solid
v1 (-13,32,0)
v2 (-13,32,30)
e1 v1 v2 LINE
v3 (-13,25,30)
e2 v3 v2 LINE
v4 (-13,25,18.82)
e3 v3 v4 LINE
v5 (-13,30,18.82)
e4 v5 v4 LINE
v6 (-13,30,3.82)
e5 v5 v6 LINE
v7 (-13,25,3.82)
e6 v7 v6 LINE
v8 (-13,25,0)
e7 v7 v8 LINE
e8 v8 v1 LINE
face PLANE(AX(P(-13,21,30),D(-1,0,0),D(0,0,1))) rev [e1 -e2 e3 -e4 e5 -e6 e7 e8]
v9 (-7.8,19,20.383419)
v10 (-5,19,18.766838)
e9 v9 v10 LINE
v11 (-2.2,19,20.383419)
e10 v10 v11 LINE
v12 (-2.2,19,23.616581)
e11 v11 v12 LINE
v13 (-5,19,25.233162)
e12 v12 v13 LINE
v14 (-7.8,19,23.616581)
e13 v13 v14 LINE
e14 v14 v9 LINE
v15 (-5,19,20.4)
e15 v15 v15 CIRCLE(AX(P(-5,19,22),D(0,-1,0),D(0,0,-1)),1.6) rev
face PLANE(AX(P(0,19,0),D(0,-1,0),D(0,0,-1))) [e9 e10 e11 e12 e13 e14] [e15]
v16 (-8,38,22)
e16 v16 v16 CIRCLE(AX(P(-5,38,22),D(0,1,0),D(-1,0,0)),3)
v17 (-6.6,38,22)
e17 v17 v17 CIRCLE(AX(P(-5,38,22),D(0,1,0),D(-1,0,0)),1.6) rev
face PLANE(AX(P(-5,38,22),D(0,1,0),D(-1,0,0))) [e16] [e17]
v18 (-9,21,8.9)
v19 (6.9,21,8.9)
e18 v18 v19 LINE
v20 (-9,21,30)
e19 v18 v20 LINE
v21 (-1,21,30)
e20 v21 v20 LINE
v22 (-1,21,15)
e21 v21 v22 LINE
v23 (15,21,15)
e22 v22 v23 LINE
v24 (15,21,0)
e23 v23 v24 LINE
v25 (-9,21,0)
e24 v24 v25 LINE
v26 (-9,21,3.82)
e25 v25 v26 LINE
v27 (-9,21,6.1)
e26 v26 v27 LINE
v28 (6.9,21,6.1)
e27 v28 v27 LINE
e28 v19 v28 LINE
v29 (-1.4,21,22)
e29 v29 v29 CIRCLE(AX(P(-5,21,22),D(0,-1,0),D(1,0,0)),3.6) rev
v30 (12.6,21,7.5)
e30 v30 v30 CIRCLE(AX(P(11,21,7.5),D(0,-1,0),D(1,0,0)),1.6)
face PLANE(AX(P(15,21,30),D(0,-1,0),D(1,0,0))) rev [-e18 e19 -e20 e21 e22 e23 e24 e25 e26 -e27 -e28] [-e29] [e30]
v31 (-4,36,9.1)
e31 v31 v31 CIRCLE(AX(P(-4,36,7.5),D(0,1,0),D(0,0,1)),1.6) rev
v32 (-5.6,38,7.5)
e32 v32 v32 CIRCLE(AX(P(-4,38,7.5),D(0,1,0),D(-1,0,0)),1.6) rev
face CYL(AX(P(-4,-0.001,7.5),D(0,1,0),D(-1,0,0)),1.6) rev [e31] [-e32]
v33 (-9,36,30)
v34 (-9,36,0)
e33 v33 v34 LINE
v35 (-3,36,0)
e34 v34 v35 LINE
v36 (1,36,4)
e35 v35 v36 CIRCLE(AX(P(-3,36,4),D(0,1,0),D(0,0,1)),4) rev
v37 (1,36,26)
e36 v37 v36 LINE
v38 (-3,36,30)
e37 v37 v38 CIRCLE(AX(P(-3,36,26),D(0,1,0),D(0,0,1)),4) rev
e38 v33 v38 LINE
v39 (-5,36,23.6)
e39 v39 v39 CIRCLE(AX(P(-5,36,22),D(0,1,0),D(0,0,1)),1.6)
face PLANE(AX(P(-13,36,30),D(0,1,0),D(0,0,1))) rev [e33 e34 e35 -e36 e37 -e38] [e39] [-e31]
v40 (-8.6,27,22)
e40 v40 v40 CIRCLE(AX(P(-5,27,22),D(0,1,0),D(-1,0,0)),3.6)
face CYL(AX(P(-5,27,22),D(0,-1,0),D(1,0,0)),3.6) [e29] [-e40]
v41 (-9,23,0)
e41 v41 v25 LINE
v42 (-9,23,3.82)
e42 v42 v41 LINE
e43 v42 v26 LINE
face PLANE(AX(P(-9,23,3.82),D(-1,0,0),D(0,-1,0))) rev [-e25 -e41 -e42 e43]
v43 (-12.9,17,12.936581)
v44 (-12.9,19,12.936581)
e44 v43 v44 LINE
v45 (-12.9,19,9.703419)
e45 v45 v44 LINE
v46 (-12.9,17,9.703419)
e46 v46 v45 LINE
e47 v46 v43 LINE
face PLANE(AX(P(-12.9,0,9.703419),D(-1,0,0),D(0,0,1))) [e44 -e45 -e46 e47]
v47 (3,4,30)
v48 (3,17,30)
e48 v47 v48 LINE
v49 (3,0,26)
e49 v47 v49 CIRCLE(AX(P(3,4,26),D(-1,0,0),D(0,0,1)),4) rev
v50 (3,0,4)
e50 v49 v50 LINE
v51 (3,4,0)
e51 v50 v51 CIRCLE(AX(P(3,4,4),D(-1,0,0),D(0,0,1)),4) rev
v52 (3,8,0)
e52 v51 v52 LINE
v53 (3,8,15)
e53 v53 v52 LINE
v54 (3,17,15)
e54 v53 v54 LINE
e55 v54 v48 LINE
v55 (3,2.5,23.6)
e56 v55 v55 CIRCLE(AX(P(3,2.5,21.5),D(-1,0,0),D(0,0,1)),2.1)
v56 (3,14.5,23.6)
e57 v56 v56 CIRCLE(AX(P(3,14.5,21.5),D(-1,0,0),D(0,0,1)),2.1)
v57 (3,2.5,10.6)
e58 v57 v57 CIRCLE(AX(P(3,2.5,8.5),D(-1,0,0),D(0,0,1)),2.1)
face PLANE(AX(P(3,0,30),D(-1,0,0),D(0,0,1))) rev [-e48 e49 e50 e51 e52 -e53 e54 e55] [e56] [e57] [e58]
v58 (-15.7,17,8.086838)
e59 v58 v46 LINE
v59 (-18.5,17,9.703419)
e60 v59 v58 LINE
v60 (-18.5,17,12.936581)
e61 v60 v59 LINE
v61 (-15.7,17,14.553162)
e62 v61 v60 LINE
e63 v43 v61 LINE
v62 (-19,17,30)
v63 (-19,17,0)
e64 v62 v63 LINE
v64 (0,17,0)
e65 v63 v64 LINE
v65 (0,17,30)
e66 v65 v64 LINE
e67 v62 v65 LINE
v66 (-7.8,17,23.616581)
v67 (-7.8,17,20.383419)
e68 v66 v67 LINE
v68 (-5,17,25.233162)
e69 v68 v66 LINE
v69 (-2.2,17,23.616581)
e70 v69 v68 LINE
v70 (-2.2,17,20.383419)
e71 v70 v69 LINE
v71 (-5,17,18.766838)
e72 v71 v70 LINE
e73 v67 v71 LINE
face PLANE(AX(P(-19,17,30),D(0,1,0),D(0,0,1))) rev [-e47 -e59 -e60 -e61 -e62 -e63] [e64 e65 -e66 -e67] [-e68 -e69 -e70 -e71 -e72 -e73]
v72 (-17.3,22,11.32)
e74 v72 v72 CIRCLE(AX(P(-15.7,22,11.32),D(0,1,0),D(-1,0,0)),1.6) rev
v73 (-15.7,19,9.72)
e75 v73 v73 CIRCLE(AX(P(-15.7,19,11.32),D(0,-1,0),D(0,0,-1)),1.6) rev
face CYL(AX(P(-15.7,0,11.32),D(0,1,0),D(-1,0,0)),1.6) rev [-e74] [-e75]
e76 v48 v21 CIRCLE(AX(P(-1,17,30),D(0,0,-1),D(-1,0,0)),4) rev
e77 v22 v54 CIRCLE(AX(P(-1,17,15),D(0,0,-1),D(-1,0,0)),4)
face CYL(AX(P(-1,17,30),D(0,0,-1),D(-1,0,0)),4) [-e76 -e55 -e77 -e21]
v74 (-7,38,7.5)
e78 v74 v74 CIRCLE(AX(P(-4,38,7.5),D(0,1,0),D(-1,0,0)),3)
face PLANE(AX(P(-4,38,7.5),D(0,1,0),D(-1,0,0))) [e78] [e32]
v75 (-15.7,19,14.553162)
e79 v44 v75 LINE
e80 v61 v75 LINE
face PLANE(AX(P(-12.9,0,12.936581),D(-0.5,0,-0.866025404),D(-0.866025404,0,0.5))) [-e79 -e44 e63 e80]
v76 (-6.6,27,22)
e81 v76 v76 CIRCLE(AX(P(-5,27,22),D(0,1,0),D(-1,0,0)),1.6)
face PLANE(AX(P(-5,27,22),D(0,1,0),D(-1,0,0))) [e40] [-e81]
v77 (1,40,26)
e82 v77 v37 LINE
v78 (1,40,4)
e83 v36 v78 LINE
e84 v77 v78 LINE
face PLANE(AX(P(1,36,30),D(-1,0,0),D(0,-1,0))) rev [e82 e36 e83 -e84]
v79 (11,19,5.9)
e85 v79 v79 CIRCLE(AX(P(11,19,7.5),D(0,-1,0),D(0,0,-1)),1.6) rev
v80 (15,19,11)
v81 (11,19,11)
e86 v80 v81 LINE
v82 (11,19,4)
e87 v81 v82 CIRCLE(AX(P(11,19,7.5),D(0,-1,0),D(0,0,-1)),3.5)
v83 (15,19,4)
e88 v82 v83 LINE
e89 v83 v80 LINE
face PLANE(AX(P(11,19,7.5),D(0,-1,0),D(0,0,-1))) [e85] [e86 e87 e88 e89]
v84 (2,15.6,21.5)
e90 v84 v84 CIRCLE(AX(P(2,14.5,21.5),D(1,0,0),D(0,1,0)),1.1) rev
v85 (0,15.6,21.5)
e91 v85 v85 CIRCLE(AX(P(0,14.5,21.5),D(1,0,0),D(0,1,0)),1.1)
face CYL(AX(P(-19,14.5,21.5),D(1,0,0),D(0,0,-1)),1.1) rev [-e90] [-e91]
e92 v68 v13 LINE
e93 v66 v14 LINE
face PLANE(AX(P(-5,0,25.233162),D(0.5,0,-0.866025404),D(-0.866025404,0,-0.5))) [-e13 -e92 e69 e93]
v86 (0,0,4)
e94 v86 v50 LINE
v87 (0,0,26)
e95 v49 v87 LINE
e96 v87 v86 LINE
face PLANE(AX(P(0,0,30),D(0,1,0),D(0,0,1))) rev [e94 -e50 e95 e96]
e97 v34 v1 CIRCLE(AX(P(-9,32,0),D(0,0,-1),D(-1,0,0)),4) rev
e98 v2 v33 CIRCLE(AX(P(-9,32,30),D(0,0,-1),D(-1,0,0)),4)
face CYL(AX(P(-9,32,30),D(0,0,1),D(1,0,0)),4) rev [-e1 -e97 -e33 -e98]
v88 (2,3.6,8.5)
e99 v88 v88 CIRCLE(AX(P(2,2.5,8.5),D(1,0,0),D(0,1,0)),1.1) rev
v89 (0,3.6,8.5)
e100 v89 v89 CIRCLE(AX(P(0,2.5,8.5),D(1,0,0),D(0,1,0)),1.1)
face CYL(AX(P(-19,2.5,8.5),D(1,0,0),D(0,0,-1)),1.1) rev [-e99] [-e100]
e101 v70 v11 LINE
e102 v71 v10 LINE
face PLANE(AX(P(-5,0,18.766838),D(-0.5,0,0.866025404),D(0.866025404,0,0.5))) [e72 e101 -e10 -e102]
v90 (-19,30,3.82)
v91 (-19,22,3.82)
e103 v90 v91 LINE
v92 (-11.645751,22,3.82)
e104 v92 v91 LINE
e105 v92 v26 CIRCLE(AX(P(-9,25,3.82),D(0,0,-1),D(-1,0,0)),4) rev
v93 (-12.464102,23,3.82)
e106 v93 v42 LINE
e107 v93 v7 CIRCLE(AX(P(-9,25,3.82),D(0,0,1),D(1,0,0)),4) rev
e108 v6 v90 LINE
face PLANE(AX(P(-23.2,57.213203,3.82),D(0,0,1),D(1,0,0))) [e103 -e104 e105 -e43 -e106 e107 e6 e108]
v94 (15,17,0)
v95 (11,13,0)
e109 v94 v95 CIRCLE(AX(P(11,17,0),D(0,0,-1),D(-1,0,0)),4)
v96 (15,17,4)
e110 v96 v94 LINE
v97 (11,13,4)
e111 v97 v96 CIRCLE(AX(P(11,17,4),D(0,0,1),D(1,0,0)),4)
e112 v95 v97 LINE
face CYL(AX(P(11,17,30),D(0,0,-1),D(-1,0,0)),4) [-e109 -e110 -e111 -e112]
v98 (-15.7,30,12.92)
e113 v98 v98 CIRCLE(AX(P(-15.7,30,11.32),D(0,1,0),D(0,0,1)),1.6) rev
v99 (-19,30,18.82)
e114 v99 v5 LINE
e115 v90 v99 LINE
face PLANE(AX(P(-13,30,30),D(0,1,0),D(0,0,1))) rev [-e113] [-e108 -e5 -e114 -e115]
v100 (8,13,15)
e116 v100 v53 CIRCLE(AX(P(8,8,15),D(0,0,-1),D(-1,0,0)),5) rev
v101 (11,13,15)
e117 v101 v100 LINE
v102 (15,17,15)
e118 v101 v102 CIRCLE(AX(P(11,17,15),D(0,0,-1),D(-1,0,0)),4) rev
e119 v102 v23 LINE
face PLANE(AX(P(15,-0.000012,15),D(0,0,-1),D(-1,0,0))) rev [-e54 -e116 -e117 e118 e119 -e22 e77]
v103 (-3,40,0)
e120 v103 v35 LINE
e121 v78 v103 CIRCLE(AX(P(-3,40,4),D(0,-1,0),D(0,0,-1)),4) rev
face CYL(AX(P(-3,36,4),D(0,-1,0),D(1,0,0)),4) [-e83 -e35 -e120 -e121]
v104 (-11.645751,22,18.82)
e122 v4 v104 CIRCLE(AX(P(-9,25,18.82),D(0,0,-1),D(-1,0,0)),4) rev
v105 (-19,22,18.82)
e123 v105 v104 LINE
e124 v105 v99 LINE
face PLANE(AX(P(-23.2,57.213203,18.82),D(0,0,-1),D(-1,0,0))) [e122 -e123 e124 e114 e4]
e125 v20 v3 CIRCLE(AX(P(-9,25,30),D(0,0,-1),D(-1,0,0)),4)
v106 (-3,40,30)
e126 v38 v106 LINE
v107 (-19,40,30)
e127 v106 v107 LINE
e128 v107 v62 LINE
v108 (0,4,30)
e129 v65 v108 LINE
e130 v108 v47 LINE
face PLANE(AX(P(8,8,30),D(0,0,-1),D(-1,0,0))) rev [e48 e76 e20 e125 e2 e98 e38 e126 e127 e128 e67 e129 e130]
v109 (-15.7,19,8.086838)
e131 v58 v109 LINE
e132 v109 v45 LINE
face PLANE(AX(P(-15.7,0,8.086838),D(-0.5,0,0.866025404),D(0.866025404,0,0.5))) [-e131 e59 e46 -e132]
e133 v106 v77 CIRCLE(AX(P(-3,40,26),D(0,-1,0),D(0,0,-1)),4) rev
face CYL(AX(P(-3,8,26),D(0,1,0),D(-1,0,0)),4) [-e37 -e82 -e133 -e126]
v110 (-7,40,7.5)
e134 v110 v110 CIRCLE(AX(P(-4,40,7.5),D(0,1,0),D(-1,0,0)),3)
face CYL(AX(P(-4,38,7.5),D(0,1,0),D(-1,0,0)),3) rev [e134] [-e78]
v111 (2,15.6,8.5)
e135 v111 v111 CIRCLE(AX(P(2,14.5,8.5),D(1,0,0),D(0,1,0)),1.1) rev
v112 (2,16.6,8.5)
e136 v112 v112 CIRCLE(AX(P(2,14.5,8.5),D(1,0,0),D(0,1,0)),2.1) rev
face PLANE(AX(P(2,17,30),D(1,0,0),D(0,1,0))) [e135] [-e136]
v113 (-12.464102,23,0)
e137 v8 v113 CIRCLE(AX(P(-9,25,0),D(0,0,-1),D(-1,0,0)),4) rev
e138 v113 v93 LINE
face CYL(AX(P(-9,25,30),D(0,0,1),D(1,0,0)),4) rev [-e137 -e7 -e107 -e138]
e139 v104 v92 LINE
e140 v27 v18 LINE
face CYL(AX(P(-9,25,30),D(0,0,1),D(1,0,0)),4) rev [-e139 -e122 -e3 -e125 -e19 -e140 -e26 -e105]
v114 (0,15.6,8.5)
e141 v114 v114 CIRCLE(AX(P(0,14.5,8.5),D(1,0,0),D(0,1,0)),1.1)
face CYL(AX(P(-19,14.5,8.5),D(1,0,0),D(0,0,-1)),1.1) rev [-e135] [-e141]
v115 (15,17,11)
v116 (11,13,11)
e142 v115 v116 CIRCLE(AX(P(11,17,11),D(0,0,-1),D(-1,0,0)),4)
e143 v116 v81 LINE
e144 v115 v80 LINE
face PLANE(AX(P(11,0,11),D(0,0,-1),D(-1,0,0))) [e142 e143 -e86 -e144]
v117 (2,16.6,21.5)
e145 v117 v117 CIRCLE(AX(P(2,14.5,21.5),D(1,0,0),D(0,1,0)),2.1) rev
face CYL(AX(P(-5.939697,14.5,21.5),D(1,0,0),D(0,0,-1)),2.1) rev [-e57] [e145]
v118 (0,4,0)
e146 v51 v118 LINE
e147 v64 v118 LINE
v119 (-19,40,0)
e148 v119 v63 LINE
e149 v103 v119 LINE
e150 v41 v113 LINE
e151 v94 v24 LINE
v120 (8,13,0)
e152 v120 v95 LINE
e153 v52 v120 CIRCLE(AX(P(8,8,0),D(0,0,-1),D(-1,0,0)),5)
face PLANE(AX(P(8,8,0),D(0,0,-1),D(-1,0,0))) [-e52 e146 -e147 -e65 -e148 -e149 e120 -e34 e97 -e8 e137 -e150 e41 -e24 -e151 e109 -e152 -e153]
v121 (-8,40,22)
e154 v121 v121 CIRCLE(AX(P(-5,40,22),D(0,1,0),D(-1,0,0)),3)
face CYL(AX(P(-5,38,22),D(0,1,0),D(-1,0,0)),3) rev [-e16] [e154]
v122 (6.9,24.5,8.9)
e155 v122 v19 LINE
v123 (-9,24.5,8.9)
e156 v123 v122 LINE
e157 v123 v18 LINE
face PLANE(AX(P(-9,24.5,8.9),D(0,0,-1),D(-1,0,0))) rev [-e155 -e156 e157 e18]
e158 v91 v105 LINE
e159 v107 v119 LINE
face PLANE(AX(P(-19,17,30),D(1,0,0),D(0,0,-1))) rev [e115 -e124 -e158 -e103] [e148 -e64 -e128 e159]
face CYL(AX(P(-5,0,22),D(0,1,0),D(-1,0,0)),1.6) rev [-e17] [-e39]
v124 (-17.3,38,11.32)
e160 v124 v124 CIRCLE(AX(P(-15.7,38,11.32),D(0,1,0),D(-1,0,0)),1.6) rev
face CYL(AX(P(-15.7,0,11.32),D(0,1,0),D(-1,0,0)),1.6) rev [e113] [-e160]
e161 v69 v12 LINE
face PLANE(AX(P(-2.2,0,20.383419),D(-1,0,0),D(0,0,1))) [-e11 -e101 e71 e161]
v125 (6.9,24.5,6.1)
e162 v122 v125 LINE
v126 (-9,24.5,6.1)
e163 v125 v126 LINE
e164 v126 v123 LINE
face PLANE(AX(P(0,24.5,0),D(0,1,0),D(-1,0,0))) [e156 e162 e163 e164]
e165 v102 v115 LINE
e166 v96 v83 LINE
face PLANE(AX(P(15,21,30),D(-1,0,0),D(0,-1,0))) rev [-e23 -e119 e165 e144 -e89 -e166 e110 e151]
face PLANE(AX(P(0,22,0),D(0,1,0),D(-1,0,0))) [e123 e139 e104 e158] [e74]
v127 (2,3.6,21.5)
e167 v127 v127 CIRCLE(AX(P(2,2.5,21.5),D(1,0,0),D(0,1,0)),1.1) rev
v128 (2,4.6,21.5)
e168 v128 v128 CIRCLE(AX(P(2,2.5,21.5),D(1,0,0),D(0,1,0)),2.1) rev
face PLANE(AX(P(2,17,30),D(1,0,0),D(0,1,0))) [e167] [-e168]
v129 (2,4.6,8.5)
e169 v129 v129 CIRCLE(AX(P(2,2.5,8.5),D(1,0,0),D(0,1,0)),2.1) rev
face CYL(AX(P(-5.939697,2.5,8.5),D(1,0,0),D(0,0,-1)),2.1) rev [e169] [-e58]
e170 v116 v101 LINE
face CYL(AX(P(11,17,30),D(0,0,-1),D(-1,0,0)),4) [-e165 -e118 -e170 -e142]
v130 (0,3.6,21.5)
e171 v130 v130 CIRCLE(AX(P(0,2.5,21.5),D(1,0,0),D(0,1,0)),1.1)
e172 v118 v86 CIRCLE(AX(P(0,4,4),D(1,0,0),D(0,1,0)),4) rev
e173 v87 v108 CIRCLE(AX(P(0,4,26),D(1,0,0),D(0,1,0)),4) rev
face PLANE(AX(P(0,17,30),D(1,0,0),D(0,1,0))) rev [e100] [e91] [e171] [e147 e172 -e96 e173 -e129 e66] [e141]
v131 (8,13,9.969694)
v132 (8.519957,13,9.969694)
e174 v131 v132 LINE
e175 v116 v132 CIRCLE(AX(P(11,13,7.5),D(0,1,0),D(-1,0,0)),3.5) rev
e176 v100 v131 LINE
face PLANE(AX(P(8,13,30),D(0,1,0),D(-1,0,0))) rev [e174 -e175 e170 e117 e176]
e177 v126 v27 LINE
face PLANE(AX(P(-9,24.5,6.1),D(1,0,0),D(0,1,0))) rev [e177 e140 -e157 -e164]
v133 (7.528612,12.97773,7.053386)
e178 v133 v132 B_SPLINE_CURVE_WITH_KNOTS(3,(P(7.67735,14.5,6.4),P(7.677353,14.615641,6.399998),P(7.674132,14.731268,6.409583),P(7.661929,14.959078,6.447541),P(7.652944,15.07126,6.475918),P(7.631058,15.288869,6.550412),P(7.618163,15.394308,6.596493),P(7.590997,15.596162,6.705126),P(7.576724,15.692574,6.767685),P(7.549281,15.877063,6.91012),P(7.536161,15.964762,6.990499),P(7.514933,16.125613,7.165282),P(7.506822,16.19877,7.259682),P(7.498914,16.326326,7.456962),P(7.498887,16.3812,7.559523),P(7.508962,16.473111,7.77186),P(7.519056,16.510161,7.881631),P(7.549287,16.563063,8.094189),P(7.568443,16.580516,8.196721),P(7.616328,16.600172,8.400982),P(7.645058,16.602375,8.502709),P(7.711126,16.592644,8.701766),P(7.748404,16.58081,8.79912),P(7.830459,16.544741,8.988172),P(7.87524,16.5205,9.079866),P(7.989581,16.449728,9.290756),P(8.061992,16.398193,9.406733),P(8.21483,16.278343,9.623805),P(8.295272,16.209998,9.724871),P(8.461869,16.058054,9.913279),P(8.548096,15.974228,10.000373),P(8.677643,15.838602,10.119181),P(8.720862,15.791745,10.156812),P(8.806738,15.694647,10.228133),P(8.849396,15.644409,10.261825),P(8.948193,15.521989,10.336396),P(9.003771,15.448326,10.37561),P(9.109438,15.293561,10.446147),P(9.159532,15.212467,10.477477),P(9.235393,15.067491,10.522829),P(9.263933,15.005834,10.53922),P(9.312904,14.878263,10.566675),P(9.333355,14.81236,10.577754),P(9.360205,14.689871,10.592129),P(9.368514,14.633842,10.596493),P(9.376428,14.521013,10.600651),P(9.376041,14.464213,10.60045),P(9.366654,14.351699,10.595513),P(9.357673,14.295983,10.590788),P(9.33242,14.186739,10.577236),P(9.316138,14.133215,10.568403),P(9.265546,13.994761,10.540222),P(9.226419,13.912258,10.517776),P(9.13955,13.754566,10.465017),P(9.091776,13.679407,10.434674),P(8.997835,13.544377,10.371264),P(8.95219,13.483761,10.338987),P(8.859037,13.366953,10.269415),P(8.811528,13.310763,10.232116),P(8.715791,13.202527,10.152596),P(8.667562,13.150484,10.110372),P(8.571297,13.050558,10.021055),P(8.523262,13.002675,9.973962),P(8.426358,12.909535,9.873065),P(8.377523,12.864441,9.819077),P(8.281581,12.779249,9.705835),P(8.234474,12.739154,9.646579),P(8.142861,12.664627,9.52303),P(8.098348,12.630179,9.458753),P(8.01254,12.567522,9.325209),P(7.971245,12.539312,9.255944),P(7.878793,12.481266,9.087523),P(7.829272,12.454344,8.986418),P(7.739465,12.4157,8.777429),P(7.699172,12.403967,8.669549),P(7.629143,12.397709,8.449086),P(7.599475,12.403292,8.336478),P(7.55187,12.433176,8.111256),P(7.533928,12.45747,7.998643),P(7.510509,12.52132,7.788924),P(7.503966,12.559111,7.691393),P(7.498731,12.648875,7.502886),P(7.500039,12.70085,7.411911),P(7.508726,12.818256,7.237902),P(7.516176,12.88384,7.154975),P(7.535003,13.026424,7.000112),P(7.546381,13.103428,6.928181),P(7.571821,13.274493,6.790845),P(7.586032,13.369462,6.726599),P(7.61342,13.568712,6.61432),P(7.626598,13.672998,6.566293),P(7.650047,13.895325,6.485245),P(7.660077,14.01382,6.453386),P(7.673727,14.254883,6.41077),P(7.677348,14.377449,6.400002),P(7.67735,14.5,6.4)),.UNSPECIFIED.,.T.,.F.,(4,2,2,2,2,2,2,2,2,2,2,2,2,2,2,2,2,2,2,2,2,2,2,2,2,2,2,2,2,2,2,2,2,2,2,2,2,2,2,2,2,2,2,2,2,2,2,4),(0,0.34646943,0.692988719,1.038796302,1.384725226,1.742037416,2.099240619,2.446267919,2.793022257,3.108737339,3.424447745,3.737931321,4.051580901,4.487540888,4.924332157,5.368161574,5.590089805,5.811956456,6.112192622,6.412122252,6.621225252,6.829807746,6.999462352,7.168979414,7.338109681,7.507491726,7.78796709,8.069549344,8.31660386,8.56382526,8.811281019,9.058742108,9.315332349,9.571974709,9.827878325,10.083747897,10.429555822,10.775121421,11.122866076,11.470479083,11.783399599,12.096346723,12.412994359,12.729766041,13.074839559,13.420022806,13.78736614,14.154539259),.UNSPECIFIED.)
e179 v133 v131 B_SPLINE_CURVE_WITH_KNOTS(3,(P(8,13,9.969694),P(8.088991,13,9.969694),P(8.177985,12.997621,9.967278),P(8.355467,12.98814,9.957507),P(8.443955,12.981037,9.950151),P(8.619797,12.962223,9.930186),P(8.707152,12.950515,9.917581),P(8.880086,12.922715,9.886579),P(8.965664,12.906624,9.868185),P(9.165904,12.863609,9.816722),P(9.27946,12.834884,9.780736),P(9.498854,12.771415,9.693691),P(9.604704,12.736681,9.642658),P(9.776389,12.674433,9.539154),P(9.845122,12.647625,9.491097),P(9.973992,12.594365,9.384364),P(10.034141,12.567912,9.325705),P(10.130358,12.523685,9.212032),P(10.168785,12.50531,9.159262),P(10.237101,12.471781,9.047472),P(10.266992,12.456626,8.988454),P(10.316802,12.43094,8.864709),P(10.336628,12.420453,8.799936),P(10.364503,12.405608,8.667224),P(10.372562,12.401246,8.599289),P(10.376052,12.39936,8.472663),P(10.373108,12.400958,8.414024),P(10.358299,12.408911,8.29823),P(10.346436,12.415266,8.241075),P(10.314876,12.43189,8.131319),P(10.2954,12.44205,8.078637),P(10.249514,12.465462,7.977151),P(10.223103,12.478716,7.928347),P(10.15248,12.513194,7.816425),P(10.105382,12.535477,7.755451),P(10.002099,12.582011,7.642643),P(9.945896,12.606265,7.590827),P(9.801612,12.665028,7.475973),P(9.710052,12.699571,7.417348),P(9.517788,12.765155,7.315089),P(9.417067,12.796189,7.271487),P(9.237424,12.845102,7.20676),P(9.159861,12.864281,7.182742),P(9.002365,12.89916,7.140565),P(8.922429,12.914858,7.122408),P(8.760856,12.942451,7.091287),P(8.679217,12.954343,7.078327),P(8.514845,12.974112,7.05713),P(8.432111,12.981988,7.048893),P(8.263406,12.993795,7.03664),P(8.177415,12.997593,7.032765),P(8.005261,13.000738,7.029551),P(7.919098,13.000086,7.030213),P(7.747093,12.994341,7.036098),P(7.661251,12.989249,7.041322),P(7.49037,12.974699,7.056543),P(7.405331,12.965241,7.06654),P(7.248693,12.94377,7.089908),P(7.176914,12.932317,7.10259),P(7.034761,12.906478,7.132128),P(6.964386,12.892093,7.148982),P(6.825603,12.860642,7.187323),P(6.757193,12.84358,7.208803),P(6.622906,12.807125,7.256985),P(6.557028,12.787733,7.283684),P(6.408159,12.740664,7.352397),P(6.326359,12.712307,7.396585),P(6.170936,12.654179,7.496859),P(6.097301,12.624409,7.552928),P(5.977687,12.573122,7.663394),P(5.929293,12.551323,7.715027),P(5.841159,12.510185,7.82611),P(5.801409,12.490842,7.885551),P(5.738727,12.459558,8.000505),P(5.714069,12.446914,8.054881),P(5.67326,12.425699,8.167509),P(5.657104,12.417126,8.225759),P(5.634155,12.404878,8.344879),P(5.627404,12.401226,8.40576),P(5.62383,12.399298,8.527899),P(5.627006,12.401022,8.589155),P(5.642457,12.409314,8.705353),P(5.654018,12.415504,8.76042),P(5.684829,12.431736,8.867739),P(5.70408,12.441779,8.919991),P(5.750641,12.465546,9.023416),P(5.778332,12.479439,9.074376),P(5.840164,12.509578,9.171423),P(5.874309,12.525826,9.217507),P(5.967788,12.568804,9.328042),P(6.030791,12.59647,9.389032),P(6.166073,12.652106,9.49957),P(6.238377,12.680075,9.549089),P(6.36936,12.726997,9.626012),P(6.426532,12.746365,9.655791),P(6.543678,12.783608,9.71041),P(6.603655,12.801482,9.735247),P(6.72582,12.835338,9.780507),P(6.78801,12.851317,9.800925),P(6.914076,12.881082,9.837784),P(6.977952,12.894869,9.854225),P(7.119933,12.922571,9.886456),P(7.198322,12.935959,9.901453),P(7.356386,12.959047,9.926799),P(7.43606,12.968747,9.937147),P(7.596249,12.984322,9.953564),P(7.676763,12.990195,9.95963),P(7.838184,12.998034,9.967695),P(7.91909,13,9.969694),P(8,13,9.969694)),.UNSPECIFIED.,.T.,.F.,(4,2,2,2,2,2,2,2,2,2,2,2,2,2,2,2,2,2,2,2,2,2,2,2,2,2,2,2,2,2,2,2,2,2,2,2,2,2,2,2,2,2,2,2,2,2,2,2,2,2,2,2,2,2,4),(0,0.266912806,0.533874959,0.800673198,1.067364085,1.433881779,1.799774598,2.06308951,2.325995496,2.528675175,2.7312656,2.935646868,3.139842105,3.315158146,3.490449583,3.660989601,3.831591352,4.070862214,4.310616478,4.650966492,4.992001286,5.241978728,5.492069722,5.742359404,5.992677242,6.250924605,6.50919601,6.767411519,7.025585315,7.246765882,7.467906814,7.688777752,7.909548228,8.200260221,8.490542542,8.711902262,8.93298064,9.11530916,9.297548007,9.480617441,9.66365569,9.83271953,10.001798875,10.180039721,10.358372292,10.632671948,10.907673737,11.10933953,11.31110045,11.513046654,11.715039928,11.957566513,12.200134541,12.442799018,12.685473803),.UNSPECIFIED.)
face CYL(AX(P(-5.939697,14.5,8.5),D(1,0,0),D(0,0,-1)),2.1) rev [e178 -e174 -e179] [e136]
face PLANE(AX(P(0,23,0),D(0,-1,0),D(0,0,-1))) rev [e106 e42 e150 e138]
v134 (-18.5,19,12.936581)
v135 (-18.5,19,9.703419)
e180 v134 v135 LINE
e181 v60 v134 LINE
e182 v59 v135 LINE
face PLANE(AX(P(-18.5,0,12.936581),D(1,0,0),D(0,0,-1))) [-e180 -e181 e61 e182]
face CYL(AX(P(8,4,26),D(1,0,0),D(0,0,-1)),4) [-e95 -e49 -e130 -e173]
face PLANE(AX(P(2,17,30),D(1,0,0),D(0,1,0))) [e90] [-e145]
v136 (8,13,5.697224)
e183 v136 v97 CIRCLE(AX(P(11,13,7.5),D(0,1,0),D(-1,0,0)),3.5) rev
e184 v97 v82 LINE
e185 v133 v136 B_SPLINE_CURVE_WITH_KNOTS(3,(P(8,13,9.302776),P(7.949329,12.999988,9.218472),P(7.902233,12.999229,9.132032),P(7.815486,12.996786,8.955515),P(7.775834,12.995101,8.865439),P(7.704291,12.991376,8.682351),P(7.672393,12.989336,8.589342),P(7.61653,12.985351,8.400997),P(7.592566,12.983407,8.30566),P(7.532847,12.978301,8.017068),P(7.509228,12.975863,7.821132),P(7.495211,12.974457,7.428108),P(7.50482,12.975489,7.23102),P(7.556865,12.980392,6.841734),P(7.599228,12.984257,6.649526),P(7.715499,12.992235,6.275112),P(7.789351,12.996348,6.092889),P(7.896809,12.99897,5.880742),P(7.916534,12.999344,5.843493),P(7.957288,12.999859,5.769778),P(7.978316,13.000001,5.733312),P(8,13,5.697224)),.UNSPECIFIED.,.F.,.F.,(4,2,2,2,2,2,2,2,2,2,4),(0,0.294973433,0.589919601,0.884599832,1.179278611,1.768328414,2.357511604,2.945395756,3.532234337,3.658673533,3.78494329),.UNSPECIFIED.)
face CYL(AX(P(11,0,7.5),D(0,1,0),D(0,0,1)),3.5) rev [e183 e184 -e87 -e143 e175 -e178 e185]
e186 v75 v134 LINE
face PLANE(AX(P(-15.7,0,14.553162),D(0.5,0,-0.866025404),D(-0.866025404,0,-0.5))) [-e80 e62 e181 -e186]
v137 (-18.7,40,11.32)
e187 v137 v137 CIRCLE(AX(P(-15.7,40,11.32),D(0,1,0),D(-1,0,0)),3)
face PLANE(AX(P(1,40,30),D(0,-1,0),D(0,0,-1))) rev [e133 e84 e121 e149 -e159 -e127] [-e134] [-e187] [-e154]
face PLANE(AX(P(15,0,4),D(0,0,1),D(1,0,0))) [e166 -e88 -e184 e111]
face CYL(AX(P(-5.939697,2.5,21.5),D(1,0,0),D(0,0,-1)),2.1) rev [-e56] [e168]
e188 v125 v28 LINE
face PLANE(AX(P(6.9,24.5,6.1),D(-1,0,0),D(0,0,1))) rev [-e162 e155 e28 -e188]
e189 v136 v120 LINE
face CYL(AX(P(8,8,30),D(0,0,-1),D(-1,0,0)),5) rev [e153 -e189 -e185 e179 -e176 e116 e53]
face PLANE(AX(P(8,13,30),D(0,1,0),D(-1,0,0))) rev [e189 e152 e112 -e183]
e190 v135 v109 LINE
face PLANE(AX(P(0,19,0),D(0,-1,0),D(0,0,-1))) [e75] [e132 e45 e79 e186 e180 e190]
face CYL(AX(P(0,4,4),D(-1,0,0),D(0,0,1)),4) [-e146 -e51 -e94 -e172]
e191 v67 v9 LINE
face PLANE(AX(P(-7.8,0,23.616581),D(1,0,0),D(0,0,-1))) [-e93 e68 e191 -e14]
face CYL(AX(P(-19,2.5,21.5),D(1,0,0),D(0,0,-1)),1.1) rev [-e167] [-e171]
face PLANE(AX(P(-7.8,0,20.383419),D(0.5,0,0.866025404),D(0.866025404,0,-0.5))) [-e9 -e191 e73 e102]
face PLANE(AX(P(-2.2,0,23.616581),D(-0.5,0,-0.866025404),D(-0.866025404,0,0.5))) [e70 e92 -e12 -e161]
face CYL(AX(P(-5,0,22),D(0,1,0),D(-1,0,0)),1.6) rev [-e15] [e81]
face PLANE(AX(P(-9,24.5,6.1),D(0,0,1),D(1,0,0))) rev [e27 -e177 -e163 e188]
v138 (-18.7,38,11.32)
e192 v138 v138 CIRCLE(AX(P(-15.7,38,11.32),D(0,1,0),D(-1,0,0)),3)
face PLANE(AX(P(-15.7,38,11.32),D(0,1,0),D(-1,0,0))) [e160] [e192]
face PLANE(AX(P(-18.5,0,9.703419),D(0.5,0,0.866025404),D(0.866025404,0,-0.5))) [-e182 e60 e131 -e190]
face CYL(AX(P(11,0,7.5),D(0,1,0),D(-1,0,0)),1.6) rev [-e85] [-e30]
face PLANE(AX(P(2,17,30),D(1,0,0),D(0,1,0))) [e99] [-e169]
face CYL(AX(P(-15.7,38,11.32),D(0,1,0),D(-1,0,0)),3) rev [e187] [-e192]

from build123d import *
from build123d.topology import SkipClean

# Parameters (mm, degrees)
RESSALTO_EXTRUS_O1_DEPTH      = 30
CORTE_EXTRUS_O1_DEPTH         = 54.488316481
CORTE_EXTRUS_O1_DEPTH_BACK    = 54.488316481
ESBO_O3_R                     = 1.1
CORTE_EXTRUS_O6_DEPTH         = 54.488316481
CORTE_EXTRUS_O6_DEPTH_BACK    = 54.488316481
ESBO_O4_W                     = 12
ESBO_O4_H                     = 15
ESBO_O5_R                     = 1.6
CORTE_EXTRUS_O7_DEPTH         = 54.488316481
CORTE_EXTRUS_O9_START         = 1
ESBO_O7_W                     = 15
ESBO_O7_H                     = 15
CORTE_EXTRUS_O9_DEPTH         = 8
CORTE_EXTRUS_O11_REACH        = 55.488
ESBO_O9_R                     = 1.6
ESBO_O8_R                     = 3
CORTE_EXTRUS_O10_DEPTH        = 2
CORTE_EXTRUS_O14_DEPTH        = 43.308391603
CORTE_EXTRUS_O14_DEPTH_BACK   = 2
CORTE_EXTRUS_O16_DEPTH        = 55.626001135
CORTE_EXTRUS_O16_DEPTH_BACK   = 1
ESBO_O15_R                    = 2.1
FILETE1_R                     = 4
ESBO_O16_W                    = 10
ESBO_O16_H                    = 3.82
RESSALTO_EXTRUS_O2_DEPTH      = 2
ESBO_O17_W                    = 15.9
ESBO_O17_H                    = 2.8
RESSALTO_EXTRUS_O3_DEPTH      = 3.5
RESSALTO_EXTRUS_O4_DEPTH      = 6
RESSALTO_EXTRUS_O4_DEPTH_BACK = 1
ESBO_O20_R                    = 3.6
ESBO_O20_R_2                  = 1.6


with BuildPart() as part:
    # Esboço1 → Ressalto-extrusão1 (new body)
    with BuildSketch(Plane.XY):
        with BuildLine():
            Line((0, 0), (3, 0))
            Line((3, 0), (3, 8))
            ThreePointArc((3, 8), (4.464466094, 11.535533906), (8, 13))
            Line((8, 13), (15, 13))
            Line((15, 13), (15, 21))
            Line((15, 21), (-13, 21))
            Line((-13, 21), (-13, 36))
            Line((-13, 36), (1, 36))
            Line((1, 36), (1, 40))
            Line((1, 40), (-19, 40))
            Line((-19, 40), (-19, 17))
            Line((-19, 17), (0, 17))
            Line((0, 17), (0, 0))
        make_face()
    extrude(amount=RESSALTO_EXTRUS_O1_DEPTH)

    # Esboço3 → Corte-extrusão1 (cut, two sides: drawn at the far end of the back side and taken through both)
    with BuildSketch(Plane(origin=(0, 0, 0), x_dir=(0, 0, -1), z_dir=(1, 0, 0)).offset(-CORTE_EXTRUS_O1_DEPTH_BACK)):
        with Locations((-8.5, 14.5)):
            Circle(ESBO_O3_R)
        with Locations(Location((-21.5, 14.5, 0), (0, 0, 90))):
            Circle(ESBO_O3_R)
        with Locations(Location((-8.5, 2.5, 0), (0, 0, 90))):
            Circle(ESBO_O3_R)
        with Locations(Location((-21.5, 2.5, 0), (0, 0, 90))):
            Circle(ESBO_O3_R)
    extrude(amount=CORTE_EXTRUS_O1_DEPTH + CORTE_EXTRUS_O1_DEPTH_BACK, mode=Mode.SUBTRACT)

    # Esboço4 → Corte-extrusão6 (cut, two sides: drawn at the far end of the back side and taken through both)
    with BuildSketch(Plane(origin=(0, 0, 0), x_dir=(1, 0, 0), z_dir=(0, 1, 0)).offset(-CORTE_EXTRUS_O6_DEPTH_BACK)):
        with Locations((9, -22.5)):
            Rectangle(ESBO_O4_W, ESBO_O4_H)
    extrude(amount=CORTE_EXTRUS_O6_DEPTH + CORTE_EXTRUS_O6_DEPTH_BACK, mode=Mode.SUBTRACT)

    # Esboço5 → Corte-extrusão7 (cut, through all)
    with BuildSketch(Plane(origin=(0, 40, 0), x_dir=(1, 0, 0), z_dir=(0, 1, 0))):
        with Locations(Location((-5, -22, 0), (0, 0, 270))):
            Circle(ESBO_O5_R)
        with Locations(Location((-15.7, -11.32, 0), (0, 0, 180))):
            Circle(ESBO_O5_R)
        with Locations(Location((11, -7.5, 0), (0, 0, 180))):
            Circle(ESBO_O5_R)
    extrude(amount=-CORTE_EXTRUS_O7_DEPTH, mode=Mode.SUBTRACT)

    # Esboço7 → Corte-extrusão9 (cut)
    with BuildSketch(Plane(origin=(0, 21, 0), x_dir=(1, 0, 0), z_dir=(0, 1, 0)).offset(CORTE_EXTRUS_O9_START)):
        with Locations((-15.7, -11.32)):
            Rectangle(ESBO_O7_W, ESBO_O7_H)
    extrude(amount=CORTE_EXTRUS_O9_DEPTH, mode=Mode.SUBTRACT)

    # Esboço9 → Corte-extrusão11 (cut, up to next)
    with BuildSketch(Plane(origin=(0, 40, 0), x_dir=(1, 0, 0), z_dir=(0, 1, 0)), mode=Mode.PRIVATE) as corte_extrus_o11_sk1:
        with Locations(Location((-4, -7.5, 0), (0, 0, 180))):
            Circle(ESBO_O9_R)
    corte_extrus_o11_tool1 = extrude(corte_extrus_o11_sk1.sketch, amount=-CORTE_EXTRUS_O11_REACH, mode=Mode.PRIVATE) & part.part
    add(corte_extrus_o11_tool1.solids().sort_by_distance((-4, 40, 7.5))[0], mode=Mode.SUBTRACT)

    # Esboço8 → Corte-extrusão10 (cut)
    with BuildSketch(Plane(origin=(0, 40, 0), x_dir=(1, 0, 0), z_dir=(0, 1, 0))):
        with Locations(Location((-15.7, -11.32, 0), (0, 0, 180))):
            Circle(ESBO_O8_R)
        with Locations(Location((-5, -22, 0), (0, 0, 180))):
            Circle(ESBO_O8_R)
        with Locations(Location((-4, -7.5, 0), (0, 0, 180))):
            Circle(ESBO_O8_R)
    extrude(amount=-CORTE_EXTRUS_O10_DEPTH, mode=Mode.SUBTRACT)

    # Esboço14 → Corte-extrusão14 (cut, two sides: drawn at the far end of the back side and taken through both)
    with BuildSketch(Plane.XZ.offset(-17).offset(-CORTE_EXTRUS_O14_DEPTH_BACK)):
        with BuildLine():
            Line((11, 11), (15, 11))
            Line((15, 11), (15, 4))
            Line((15, 4), (11, 4))
            ThreePointArc((11, 4), (7.5, 7.5), (11, 11))
        make_face()
        Polygon((-5, 25.233161507), (-7.8, 23.616580754), (-7.8, 20.383419246), (-5, 18.766838493), (-2.2, 20.383419246), (-2.2, 23.616580754), align=None)
        Polygon((-15.7, 14.553161507), (-18.5, 12.936580754), (-18.5, 9.703419246), (-15.7, 8.086838493), (-12.9, 9.703419246), (-12.9, 12.936580754), align=None)
    extrude(amount=CORTE_EXTRUS_O14_DEPTH + CORTE_EXTRUS_O14_DEPTH_BACK, mode=Mode.SUBTRACT)

    # Esboço15 → Corte-extrusão16 (cut, two sides: drawn at the far end of the back side and taken through both)
    with BuildSketch(Plane(origin=(3, 0, 0), x_dir=(0, 0, -1), z_dir=(1, 0, 0)).offset(-CORTE_EXTRUS_O16_DEPTH_BACK)):
        with Locations(Location((-21.5, 14.5, 0), (0, 0, 90))):
            Circle(ESBO_O15_R)
        with Locations(Location((-8.5, 14.5, 0), (0, 0, 313.540252108))):
            Circle(ESBO_O15_R)
        with Locations(Location((-8.5, 2.5, 0), (0, 0, 90))):
            Circle(ESBO_O15_R)
        with Locations(Location((-21.5, 2.5, 0), (0, 0, 90))):
            Circle(ESBO_O15_R)
    extrude(amount=CORTE_EXTRUS_O16_DEPTH + CORTE_EXTRUS_O16_DEPTH_BACK, mode=Mode.SUBTRACT)

    # Filete1
    # the kernel refuses this fillet: 4 mm, written as the material it adds along each edge
    with BuildSketch(Plane(origin=(-13, 21, 0), x_dir=(1, 0, 0), z_dir=(0, 0, 1))) as filete1_piece_1_section:
        with BuildLine():
            CenterArc((FILETE1_R, FILETE1_R), FILETE1_R, 180, 90)
            Line((0, FILETE1_R), (0, 0))
            Line((0, 0), (FILETE1_R, 0))
        make_face()
    filete1_piece_1 = extrude(amount=30, mode=Mode.PRIVATE)
    filete1_piece_1 = split(filete1_piece_1, bisect_by=Plane(origin=(-11.759467995, 21.365337359, 3.82), z_dir=(0, 0, -1)), keep=Keep.TOP, mode=Mode.PRIVATE)
    filete1_piece_1 = split(filete1_piece_1, bisect_by=Plane(origin=(-11.759467995, 22, 1.91), z_dir=(0, -1, 0)), keep=Keep.TOP, mode=Mode.PRIVATE)
    add(filete1_piece_1)
    with BuildSketch(Plane(origin=(-13, 21, 0), x_dir=(1, 0, 0), z_dir=(0, 0, 1))) as filete1_piece_2_section:
        with BuildLine():
            CenterArc((FILETE1_R, FILETE1_R), FILETE1_R, 180, 90)
            Line((0, FILETE1_R), (0, 0))
            Line((0, 0), (FILETE1_R, 0))
        make_face()
    filete1_piece_2 = extrude(amount=30, mode=Mode.PRIVATE)
    filete1_piece_2 = split(filete1_piece_2, bisect_by=Plane(origin=(-12.678584174, 22.84777915, 3.82), z_dir=(0, 0, -1)), keep=Keep.TOP, mode=Mode.PRIVATE)
    filete1_piece_2 = split(filete1_piece_2, bisect_by=Plane(origin=(-12.678584174, 22, 1.91), z_dir=(0, 1, 0)), keep=Keep.TOP, mode=Mode.PRIVATE)
    add(filete1_piece_2)
    with BuildSketch(Plane(origin=(-13, 21, 0), x_dir=(1, 0, 0), z_dir=(0, 0, 1))) as filete1_piece_3_section:
        with BuildLine():
            CenterArc((FILETE1_R, FILETE1_R), FILETE1_R, 180, 90)
            Line((0, FILETE1_R), (0, 0))
            Line((0, 0), (FILETE1_R, 0))
        make_face()
    filete1_piece_3 = extrude(amount=30, mode=Mode.PRIVATE)
    filete1_piece_3 = split(filete1_piece_3, bisect_by=Plane(origin=(-11.759467995, 21.365337359, 3.82), z_dir=(0, 0, 1)), keep=Keep.TOP, mode=Mode.PRIVATE)
    filete1_piece_3 = split(filete1_piece_3, bisect_by=Plane(origin=(-11.759467995, 22, 11.32), z_dir=(0, -1, 0)), keep=Keep.TOP, mode=Mode.PRIVATE)
    filete1_piece_3 = split(filete1_piece_3, bisect_by=Plane(origin=(-11.759467995, 21.365337359, 18.82), z_dir=(0, 0, -1)), keep=Keep.TOP, mode=Mode.PRIVATE)
    add(filete1_piece_3)
    with BuildSketch(Plane(origin=(-13, 21, 0), x_dir=(1, 0, 0), z_dir=(0, 0, 1))) as filete1_piece_4_section:
        with BuildLine():
            CenterArc((FILETE1_R, FILETE1_R), FILETE1_R, 180, 90)
            Line((0, FILETE1_R), (0, 0))
            Line((0, 0), (FILETE1_R, 0))
        make_face()
    filete1_piece_4 = extrude(amount=30, mode=Mode.PRIVATE)
    filete1_piece_4 = split(filete1_piece_4, bisect_by=Plane(origin=(-11.759467995, 22, 24.41), z_dir=(0, -1, 0)), keep=Keep.TOP, mode=Mode.PRIVATE)
    filete1_piece_4 = split(filete1_piece_4, bisect_by=Plane(origin=(-11.759467995, 21.365337359, 18.82), z_dir=(0, 0, 1)), keep=Keep.TOP, mode=Mode.PRIVATE)
    add(filete1_piece_4)
    with BuildSketch(Plane(origin=(-13, 21, 0), x_dir=(1, 0, 0), z_dir=(0, 0, 1))) as filete1_piece_5_section:
        with BuildLine():
            CenterArc((FILETE1_R, FILETE1_R), FILETE1_R, 180, 90)
            Line((0, FILETE1_R), (0, 0))
            Line((0, 0), (FILETE1_R, 0))
        make_face()
    filete1_piece_5 = extrude(amount=30, mode=Mode.PRIVATE)
    filete1_piece_5 = split(filete1_piece_5, bisect_by=Plane(origin=(-12.678584174, 22, 24.41), z_dir=(0, 1, 0)), keep=Keep.TOP, mode=Mode.PRIVATE)
    filete1_piece_5 = split(filete1_piece_5, bisect_by=Plane(origin=(-12.678584174, 22.84777915, 18.82), z_dir=(0, 0, 1)), keep=Keep.TOP, mode=Mode.PRIVATE)
    add(filete1_piece_5)
    with BuildSketch(Plane(origin=(-13, 36, 0), x_dir=(1, 0, 0), z_dir=(0, 0, 1))) as filete1_piece_6:
        with BuildLine():
            CenterArc((FILETE1_R, -FILETE1_R), FILETE1_R, 90, 90)
            Line((0, -FILETE1_R), (0, 0))
            Line((0, 0), (FILETE1_R, 0))
        make_face()
    extrude(amount=30)
    # the kernel refuses this fillet: 4 mm, written as the material it takes off along each edge
    with BuildSketch(Plane(origin=(-10, 0, 0), x_dir=(0, 0, 1), z_dir=(1, 0, 0))) as filete1_2_piece_1:
        with BuildLine():
            CenterArc((FILETE1_R, -FILETE1_R), FILETE1_R, 90, 90)
            Line((0, -FILETE1_R), (0, 0))
            Line((0, 0), (FILETE1_R, 0))
        make_face()
    extrude(amount=23, mode=Mode.SUBTRACT)
    with BuildSketch(Plane(origin=(-10, 0, 30), x_dir=(0, 0, -1), z_dir=(1, 0, 0))) as filete1_2_piece_2:
        with BuildLine():
            CenterArc((FILETE1_R, FILETE1_R), FILETE1_R, 180, 90)
            Line((0, FILETE1_R), (0, 0))
            Line((0, 0), (FILETE1_R, 0))
        make_face()
    extrude(amount=23, mode=Mode.SUBTRACT)
    with BuildSketch(Plane(origin=(3, 21, 15), x_dir=(-1, 0, 0), z_dir=(0, 0, 1))) as filete1_2_piece_3:
        with BuildLine():
            CenterArc((FILETE1_R, FILETE1_R), FILETE1_R, 180, 90)
            Line((0, FILETE1_R), (0, 0))
            Line((0, 0), (FILETE1_R, 0))
        make_face()
    extrude(amount=25, mode=Mode.SUBTRACT)
    with BuildSketch(Plane(origin=(1, 26, 0), x_dir=(0, 0, 1), z_dir=(0, 1, 0)), Plane(origin=(15, 13, -10), x_dir=(-1, 0, 0), z_dir=(0, 0, 1)), Plane(origin=(15, 13, 1), x_dir=(-1, 0, 0), z_dir=(0, 0, 1)), Plane(origin=(1, 26, 30), x_dir=(-1, 0, 0), z_dir=(0, 1, 0))) as filete1_2_piece_4:
        with BuildLine():
            CenterArc((FILETE1_R, -FILETE1_R), FILETE1_R, 90, 90)
            Line((0, -FILETE1_R), (0, 0))
            Line((0, 0), (FILETE1_R, 0))
        make_face()
    extrude(amount=24, mode=Mode.SUBTRACT)

    # Esboço16 → Ressalto-extrusão2 (add)
    with BuildSketch(Plane(origin=(0, 21, 0), x_dir=(1, 0, 0), z_dir=(0, 1, 0))):
        with Locations((-14, -1.91)):
            Rectangle(ESBO_O16_W, ESBO_O16_H)
    extrude(amount=RESSALTO_EXTRUS_O2_DEPTH)

    # Esboço17 → Ressalto-extrusão3 (add)
    with BuildSketch(Plane(origin=(0, 21, 0), x_dir=(1, 0, 0), z_dir=(0, 1, 0))):
        with Locations((-1.05, -7.5)):
            Rectangle(ESBO_O17_W, ESBO_O17_H)
    extrude(amount=RESSALTO_EXTRUS_O3_DEPTH)

    # Esboço20 → Ressalto-extrusão4 (add, two sides: drawn at the far end of the back side and taken through both)
    with SkipClean():  # the faces are left unmerged after this step: merging them gives an invalid solid
        with BuildSketch(Plane(origin=(0, 21, 0), x_dir=(1, 0, 0), z_dir=(0, 1, 0)).offset(-RESSALTO_EXTRUS_O4_DEPTH_BACK)):
            with Locations((-5, -22)):
                Circle(ESBO_O20_R)
            with Locations(Location((-5, -22, 0), (0, 0, 180))):
                Circle(ESBO_O20_R_2, mode=Mode.SUBTRACT)
        extrude(amount=RESSALTO_EXTRUS_O4_DEPTH + RESSALTO_EXTRUS_O4_DEPTH_BACK)


solid = part.part
